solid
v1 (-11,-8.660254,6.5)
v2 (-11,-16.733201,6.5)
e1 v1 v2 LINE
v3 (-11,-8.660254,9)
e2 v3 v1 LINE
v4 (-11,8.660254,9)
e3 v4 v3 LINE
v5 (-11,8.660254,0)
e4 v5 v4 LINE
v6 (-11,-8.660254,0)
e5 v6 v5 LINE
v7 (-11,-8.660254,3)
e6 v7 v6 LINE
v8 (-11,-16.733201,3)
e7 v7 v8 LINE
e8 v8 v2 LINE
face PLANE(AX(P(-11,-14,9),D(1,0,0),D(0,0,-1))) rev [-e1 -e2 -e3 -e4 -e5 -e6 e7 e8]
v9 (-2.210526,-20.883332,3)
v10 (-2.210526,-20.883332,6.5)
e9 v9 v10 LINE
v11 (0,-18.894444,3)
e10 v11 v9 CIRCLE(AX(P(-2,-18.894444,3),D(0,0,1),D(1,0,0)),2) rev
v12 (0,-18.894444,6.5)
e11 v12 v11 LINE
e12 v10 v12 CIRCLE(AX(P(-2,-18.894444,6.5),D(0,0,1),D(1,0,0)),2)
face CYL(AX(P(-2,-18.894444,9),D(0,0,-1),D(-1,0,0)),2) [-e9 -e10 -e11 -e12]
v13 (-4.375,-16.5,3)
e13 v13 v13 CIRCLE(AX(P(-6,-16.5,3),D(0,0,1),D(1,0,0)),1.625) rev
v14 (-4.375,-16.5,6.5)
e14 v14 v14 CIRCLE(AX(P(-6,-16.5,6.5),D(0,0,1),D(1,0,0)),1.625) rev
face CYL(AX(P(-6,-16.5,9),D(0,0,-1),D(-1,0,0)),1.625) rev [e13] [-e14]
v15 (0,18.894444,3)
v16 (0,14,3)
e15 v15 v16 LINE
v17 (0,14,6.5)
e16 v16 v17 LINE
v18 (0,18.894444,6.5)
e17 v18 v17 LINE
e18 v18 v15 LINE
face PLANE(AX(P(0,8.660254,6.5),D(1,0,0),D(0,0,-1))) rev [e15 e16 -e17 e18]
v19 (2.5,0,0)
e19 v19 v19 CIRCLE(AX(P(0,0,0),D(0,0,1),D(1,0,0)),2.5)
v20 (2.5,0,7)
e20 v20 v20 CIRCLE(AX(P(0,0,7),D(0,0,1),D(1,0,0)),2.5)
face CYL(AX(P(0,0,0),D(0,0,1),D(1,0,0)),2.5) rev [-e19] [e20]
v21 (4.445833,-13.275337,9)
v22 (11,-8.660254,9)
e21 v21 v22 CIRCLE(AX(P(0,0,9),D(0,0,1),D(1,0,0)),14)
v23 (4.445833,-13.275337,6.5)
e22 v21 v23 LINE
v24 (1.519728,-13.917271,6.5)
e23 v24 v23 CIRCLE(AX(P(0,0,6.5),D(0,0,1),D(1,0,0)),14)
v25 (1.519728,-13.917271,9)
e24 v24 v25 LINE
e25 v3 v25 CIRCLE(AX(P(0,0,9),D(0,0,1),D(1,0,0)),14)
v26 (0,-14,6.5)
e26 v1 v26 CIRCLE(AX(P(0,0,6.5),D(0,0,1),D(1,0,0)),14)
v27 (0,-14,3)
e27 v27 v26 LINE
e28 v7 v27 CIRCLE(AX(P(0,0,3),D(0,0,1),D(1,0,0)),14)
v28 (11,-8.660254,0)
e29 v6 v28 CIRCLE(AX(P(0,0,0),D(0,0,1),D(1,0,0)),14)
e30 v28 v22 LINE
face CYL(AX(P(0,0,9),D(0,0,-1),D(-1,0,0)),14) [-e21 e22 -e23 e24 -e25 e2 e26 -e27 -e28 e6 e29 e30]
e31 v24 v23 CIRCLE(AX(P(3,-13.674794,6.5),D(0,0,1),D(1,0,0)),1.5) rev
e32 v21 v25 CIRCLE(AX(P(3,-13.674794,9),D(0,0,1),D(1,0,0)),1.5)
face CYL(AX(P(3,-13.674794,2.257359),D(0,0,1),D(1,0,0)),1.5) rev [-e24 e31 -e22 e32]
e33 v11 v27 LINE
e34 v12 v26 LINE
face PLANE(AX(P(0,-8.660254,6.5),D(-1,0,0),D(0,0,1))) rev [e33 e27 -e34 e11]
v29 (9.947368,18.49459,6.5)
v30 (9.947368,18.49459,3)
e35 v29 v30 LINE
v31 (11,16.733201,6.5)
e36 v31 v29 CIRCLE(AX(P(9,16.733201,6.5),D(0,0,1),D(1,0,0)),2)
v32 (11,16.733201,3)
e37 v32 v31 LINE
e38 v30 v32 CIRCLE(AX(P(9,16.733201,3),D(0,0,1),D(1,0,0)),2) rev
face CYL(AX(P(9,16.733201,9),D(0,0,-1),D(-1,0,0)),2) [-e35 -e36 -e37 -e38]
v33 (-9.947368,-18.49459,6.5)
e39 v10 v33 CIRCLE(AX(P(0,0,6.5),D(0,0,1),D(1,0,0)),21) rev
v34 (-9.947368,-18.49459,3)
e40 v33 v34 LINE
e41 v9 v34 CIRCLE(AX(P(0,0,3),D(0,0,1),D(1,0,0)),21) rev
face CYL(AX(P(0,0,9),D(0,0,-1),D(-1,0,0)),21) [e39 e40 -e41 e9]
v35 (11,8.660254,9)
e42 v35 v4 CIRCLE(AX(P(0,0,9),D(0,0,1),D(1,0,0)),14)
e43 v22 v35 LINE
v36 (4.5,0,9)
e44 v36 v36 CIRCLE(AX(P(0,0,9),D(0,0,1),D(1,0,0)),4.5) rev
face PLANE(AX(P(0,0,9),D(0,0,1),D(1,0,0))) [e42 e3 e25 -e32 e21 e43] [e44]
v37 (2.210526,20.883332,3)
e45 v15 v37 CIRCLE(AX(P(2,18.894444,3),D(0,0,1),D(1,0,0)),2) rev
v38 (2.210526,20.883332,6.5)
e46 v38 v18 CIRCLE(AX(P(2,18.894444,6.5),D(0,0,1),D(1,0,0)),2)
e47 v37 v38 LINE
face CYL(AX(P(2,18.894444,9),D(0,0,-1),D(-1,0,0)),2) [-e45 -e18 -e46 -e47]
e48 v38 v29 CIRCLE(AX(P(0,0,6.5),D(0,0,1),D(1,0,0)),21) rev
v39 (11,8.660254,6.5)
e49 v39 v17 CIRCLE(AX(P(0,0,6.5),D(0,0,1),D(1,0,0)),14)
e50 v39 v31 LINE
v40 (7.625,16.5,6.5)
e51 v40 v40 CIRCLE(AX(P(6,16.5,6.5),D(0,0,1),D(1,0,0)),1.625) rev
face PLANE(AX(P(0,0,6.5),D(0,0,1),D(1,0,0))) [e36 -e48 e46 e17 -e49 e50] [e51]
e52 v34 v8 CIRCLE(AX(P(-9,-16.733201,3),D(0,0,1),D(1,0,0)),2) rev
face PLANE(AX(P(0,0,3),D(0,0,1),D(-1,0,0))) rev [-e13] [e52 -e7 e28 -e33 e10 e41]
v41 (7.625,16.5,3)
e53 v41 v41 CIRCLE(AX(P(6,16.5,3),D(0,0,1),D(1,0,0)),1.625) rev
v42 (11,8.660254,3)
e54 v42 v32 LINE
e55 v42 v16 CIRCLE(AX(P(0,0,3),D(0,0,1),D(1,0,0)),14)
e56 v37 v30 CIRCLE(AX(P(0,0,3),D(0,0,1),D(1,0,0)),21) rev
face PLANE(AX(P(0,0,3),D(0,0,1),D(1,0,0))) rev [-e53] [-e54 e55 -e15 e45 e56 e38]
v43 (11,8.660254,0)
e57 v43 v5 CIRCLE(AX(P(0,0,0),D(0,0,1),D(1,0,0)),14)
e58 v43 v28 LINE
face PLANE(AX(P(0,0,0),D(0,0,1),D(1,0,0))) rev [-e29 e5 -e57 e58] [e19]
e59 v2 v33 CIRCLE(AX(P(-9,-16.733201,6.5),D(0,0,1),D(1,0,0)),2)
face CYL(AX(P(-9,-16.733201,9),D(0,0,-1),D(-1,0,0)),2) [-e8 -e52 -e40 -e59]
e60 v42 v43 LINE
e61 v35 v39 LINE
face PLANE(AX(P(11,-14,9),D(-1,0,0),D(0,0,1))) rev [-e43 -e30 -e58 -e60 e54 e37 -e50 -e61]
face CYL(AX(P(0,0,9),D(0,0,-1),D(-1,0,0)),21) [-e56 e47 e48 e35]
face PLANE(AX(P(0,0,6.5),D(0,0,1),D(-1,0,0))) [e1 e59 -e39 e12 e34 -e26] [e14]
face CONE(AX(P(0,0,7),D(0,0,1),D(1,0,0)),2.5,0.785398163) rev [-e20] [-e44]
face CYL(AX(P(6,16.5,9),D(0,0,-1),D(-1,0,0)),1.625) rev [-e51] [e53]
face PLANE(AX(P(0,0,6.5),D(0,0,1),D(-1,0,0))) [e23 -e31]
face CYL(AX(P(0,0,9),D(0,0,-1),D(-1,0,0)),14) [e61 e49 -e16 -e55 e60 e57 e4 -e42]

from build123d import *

# Parameters (mm, degrees)
SKETCH1_R           = 14
BOSS_EXTRUDE1_DEPTH = 9
SKETCH2_OUTSIDE_W   = 38.122
SKETCH2_OUTSIDE_H   = 38.122
SKETCH2_OUTSIDE_W_2 = 22
SKETCH2_OUTSIDE_H_2 = 28
CUT_EXTRUDE1_DEPTH  = 22.748563171
SKETCH3_R           = 2.5
CUT_EXTRUDE2_DEPTH  = 20.949937343
CHAMFER1_SIZE       = 2
BOSS_EXTRUDE2_START = 3
SKETCH4_W           = 11
SKETCH4_H           = 12.339745962
BOSS_EXTRUDE2_DEPTH = 3.5
SKETCH5_R           = 1.625
CUT_EXTRUDE3_DEPTH  = 26.357444666
CUT_EXTRUDE4_START  = 3
CUT_EXTRUDE4_DEPTH  = 3.5
CIRPATTERN1_COUNT   = 2
FILLET1_R           = 2
SKETCH7_R           = 1.5
CUT_EXTRUDE5_DEPTH  = 2.5


# Read off the part's stored shape, not the designer's step: Cut-Extrude4
with BuildPart() as part:
    # Sketch1 → Boss-Extrude1 (new body)
    with BuildSketch(Plane.XY):
        Circle(SKETCH1_R)
    extrude(amount=BOSS_EXTRUDE1_DEPTH)

    # Sketch2 outside → Cut-Extrude1 (cut, through all)
    with BuildSketch(Plane.XY):
        Rectangle(SKETCH2_OUTSIDE_W, SKETCH2_OUTSIDE_H)
        Rectangle(SKETCH2_OUTSIDE_W_2, SKETCH2_OUTSIDE_H_2, mode=Mode.SUBTRACT)
    extrude(amount=CUT_EXTRUDE1_DEPTH, mode=Mode.SUBTRACT)

    # Sketch3 → Cut-Extrude2 (cut, through all)
    with BuildSketch(Plane.XY.offset(9)):
        Circle(SKETCH3_R)
    extrude(amount=-CUT_EXTRUDE2_DEPTH, mode=Mode.SUBTRACT)

    # Chamfer1
    chamfer1_edges = [part.edges().sort_by_distance(p)[0] for p in [
        (-2.5, 0, 9),
    ]]
    chamfer(chamfer1_edges, length=CHAMFER1_SIZE)

    # Sketch4 → Boss-Extrude2 (add)
    with BuildSketch(Plane.XY.offset(BOSS_EXTRUDE2_START)):
        with Locations((5.5, 14.830127019)):
            Rectangle(SKETCH4_W, SKETCH4_H)
    boss_extrude2 = extrude(amount=BOSS_EXTRUDE2_DEPTH)

    # Sketch5 → Cut-Extrude3 (cut, through all)
    with BuildSketch(Plane.XY):
        with Locations((6, 16.5)):
            Circle(SKETCH5_R)
    cut_extrude3 = extrude(amount=CUT_EXTRUDE3_DEPTH, mode=Mode.SUBTRACT)

    # Cut-Extrude4 outline → Cut-Extrude4 (cut)
    with BuildSketch(Plane.XY.offset(CUT_EXTRUDE4_START)):
        with BuildLine():
            Line((11, 21), (0, 21))
            ThreePointArc((0, 21), (5.715793024, 20.20716977), (11, 17.88854382))
            Line((11, 17.88854382), (11, 21))
        make_face()
    cut_extrude4 = extrude(amount=CUT_EXTRUDE4_DEPTH, mode=Mode.SUBTRACT)

    # CirPattern1: Boss-Extrude2, Cut-Extrude3, Cut-Extrude4 ×2 about axis
    cirpattern1_axis = Axis((0, 0, 0), (0, 0, 1))
    add([boss_extrude2.rotate(cirpattern1_axis, i * 360 / CIRPATTERN1_COUNT) for i in range(1, CIRPATTERN1_COUNT)])
    add([cut_extrude3.rotate(cirpattern1_axis, i * 360 / CIRPATTERN1_COUNT) for i in range(1, CIRPATTERN1_COUNT)], mode=Mode.SUBTRACT)
    add([cut_extrude4.rotate(cirpattern1_axis, i * 360 / CIRPATTERN1_COUNT) for i in range(1, CIRPATTERN1_COUNT)], mode=Mode.SUBTRACT)

    # Fillet1
    fillet1_edges = [part.edges().sort_by_distance(p)[0] for p in [
        (-11, -17.88854382, 4.75),
        (0, 21, 4.75),
        (11, 17.88854382, 4.75),
        (0, -21, 4.75),
    ]]
    fillet(fillet1_edges, radius=FILLET1_R)

    # Sketch7 → Cut-Extrude5 (cut)
    with BuildSketch(Plane.XY.offset(9)):
        with Locations((3, -13.674794331)):
            Circle(SKETCH7_R)
    extrude(amount=-CUT_EXTRUDE5_DEPTH, mode=Mode.SUBTRACT)


solid = part.part
